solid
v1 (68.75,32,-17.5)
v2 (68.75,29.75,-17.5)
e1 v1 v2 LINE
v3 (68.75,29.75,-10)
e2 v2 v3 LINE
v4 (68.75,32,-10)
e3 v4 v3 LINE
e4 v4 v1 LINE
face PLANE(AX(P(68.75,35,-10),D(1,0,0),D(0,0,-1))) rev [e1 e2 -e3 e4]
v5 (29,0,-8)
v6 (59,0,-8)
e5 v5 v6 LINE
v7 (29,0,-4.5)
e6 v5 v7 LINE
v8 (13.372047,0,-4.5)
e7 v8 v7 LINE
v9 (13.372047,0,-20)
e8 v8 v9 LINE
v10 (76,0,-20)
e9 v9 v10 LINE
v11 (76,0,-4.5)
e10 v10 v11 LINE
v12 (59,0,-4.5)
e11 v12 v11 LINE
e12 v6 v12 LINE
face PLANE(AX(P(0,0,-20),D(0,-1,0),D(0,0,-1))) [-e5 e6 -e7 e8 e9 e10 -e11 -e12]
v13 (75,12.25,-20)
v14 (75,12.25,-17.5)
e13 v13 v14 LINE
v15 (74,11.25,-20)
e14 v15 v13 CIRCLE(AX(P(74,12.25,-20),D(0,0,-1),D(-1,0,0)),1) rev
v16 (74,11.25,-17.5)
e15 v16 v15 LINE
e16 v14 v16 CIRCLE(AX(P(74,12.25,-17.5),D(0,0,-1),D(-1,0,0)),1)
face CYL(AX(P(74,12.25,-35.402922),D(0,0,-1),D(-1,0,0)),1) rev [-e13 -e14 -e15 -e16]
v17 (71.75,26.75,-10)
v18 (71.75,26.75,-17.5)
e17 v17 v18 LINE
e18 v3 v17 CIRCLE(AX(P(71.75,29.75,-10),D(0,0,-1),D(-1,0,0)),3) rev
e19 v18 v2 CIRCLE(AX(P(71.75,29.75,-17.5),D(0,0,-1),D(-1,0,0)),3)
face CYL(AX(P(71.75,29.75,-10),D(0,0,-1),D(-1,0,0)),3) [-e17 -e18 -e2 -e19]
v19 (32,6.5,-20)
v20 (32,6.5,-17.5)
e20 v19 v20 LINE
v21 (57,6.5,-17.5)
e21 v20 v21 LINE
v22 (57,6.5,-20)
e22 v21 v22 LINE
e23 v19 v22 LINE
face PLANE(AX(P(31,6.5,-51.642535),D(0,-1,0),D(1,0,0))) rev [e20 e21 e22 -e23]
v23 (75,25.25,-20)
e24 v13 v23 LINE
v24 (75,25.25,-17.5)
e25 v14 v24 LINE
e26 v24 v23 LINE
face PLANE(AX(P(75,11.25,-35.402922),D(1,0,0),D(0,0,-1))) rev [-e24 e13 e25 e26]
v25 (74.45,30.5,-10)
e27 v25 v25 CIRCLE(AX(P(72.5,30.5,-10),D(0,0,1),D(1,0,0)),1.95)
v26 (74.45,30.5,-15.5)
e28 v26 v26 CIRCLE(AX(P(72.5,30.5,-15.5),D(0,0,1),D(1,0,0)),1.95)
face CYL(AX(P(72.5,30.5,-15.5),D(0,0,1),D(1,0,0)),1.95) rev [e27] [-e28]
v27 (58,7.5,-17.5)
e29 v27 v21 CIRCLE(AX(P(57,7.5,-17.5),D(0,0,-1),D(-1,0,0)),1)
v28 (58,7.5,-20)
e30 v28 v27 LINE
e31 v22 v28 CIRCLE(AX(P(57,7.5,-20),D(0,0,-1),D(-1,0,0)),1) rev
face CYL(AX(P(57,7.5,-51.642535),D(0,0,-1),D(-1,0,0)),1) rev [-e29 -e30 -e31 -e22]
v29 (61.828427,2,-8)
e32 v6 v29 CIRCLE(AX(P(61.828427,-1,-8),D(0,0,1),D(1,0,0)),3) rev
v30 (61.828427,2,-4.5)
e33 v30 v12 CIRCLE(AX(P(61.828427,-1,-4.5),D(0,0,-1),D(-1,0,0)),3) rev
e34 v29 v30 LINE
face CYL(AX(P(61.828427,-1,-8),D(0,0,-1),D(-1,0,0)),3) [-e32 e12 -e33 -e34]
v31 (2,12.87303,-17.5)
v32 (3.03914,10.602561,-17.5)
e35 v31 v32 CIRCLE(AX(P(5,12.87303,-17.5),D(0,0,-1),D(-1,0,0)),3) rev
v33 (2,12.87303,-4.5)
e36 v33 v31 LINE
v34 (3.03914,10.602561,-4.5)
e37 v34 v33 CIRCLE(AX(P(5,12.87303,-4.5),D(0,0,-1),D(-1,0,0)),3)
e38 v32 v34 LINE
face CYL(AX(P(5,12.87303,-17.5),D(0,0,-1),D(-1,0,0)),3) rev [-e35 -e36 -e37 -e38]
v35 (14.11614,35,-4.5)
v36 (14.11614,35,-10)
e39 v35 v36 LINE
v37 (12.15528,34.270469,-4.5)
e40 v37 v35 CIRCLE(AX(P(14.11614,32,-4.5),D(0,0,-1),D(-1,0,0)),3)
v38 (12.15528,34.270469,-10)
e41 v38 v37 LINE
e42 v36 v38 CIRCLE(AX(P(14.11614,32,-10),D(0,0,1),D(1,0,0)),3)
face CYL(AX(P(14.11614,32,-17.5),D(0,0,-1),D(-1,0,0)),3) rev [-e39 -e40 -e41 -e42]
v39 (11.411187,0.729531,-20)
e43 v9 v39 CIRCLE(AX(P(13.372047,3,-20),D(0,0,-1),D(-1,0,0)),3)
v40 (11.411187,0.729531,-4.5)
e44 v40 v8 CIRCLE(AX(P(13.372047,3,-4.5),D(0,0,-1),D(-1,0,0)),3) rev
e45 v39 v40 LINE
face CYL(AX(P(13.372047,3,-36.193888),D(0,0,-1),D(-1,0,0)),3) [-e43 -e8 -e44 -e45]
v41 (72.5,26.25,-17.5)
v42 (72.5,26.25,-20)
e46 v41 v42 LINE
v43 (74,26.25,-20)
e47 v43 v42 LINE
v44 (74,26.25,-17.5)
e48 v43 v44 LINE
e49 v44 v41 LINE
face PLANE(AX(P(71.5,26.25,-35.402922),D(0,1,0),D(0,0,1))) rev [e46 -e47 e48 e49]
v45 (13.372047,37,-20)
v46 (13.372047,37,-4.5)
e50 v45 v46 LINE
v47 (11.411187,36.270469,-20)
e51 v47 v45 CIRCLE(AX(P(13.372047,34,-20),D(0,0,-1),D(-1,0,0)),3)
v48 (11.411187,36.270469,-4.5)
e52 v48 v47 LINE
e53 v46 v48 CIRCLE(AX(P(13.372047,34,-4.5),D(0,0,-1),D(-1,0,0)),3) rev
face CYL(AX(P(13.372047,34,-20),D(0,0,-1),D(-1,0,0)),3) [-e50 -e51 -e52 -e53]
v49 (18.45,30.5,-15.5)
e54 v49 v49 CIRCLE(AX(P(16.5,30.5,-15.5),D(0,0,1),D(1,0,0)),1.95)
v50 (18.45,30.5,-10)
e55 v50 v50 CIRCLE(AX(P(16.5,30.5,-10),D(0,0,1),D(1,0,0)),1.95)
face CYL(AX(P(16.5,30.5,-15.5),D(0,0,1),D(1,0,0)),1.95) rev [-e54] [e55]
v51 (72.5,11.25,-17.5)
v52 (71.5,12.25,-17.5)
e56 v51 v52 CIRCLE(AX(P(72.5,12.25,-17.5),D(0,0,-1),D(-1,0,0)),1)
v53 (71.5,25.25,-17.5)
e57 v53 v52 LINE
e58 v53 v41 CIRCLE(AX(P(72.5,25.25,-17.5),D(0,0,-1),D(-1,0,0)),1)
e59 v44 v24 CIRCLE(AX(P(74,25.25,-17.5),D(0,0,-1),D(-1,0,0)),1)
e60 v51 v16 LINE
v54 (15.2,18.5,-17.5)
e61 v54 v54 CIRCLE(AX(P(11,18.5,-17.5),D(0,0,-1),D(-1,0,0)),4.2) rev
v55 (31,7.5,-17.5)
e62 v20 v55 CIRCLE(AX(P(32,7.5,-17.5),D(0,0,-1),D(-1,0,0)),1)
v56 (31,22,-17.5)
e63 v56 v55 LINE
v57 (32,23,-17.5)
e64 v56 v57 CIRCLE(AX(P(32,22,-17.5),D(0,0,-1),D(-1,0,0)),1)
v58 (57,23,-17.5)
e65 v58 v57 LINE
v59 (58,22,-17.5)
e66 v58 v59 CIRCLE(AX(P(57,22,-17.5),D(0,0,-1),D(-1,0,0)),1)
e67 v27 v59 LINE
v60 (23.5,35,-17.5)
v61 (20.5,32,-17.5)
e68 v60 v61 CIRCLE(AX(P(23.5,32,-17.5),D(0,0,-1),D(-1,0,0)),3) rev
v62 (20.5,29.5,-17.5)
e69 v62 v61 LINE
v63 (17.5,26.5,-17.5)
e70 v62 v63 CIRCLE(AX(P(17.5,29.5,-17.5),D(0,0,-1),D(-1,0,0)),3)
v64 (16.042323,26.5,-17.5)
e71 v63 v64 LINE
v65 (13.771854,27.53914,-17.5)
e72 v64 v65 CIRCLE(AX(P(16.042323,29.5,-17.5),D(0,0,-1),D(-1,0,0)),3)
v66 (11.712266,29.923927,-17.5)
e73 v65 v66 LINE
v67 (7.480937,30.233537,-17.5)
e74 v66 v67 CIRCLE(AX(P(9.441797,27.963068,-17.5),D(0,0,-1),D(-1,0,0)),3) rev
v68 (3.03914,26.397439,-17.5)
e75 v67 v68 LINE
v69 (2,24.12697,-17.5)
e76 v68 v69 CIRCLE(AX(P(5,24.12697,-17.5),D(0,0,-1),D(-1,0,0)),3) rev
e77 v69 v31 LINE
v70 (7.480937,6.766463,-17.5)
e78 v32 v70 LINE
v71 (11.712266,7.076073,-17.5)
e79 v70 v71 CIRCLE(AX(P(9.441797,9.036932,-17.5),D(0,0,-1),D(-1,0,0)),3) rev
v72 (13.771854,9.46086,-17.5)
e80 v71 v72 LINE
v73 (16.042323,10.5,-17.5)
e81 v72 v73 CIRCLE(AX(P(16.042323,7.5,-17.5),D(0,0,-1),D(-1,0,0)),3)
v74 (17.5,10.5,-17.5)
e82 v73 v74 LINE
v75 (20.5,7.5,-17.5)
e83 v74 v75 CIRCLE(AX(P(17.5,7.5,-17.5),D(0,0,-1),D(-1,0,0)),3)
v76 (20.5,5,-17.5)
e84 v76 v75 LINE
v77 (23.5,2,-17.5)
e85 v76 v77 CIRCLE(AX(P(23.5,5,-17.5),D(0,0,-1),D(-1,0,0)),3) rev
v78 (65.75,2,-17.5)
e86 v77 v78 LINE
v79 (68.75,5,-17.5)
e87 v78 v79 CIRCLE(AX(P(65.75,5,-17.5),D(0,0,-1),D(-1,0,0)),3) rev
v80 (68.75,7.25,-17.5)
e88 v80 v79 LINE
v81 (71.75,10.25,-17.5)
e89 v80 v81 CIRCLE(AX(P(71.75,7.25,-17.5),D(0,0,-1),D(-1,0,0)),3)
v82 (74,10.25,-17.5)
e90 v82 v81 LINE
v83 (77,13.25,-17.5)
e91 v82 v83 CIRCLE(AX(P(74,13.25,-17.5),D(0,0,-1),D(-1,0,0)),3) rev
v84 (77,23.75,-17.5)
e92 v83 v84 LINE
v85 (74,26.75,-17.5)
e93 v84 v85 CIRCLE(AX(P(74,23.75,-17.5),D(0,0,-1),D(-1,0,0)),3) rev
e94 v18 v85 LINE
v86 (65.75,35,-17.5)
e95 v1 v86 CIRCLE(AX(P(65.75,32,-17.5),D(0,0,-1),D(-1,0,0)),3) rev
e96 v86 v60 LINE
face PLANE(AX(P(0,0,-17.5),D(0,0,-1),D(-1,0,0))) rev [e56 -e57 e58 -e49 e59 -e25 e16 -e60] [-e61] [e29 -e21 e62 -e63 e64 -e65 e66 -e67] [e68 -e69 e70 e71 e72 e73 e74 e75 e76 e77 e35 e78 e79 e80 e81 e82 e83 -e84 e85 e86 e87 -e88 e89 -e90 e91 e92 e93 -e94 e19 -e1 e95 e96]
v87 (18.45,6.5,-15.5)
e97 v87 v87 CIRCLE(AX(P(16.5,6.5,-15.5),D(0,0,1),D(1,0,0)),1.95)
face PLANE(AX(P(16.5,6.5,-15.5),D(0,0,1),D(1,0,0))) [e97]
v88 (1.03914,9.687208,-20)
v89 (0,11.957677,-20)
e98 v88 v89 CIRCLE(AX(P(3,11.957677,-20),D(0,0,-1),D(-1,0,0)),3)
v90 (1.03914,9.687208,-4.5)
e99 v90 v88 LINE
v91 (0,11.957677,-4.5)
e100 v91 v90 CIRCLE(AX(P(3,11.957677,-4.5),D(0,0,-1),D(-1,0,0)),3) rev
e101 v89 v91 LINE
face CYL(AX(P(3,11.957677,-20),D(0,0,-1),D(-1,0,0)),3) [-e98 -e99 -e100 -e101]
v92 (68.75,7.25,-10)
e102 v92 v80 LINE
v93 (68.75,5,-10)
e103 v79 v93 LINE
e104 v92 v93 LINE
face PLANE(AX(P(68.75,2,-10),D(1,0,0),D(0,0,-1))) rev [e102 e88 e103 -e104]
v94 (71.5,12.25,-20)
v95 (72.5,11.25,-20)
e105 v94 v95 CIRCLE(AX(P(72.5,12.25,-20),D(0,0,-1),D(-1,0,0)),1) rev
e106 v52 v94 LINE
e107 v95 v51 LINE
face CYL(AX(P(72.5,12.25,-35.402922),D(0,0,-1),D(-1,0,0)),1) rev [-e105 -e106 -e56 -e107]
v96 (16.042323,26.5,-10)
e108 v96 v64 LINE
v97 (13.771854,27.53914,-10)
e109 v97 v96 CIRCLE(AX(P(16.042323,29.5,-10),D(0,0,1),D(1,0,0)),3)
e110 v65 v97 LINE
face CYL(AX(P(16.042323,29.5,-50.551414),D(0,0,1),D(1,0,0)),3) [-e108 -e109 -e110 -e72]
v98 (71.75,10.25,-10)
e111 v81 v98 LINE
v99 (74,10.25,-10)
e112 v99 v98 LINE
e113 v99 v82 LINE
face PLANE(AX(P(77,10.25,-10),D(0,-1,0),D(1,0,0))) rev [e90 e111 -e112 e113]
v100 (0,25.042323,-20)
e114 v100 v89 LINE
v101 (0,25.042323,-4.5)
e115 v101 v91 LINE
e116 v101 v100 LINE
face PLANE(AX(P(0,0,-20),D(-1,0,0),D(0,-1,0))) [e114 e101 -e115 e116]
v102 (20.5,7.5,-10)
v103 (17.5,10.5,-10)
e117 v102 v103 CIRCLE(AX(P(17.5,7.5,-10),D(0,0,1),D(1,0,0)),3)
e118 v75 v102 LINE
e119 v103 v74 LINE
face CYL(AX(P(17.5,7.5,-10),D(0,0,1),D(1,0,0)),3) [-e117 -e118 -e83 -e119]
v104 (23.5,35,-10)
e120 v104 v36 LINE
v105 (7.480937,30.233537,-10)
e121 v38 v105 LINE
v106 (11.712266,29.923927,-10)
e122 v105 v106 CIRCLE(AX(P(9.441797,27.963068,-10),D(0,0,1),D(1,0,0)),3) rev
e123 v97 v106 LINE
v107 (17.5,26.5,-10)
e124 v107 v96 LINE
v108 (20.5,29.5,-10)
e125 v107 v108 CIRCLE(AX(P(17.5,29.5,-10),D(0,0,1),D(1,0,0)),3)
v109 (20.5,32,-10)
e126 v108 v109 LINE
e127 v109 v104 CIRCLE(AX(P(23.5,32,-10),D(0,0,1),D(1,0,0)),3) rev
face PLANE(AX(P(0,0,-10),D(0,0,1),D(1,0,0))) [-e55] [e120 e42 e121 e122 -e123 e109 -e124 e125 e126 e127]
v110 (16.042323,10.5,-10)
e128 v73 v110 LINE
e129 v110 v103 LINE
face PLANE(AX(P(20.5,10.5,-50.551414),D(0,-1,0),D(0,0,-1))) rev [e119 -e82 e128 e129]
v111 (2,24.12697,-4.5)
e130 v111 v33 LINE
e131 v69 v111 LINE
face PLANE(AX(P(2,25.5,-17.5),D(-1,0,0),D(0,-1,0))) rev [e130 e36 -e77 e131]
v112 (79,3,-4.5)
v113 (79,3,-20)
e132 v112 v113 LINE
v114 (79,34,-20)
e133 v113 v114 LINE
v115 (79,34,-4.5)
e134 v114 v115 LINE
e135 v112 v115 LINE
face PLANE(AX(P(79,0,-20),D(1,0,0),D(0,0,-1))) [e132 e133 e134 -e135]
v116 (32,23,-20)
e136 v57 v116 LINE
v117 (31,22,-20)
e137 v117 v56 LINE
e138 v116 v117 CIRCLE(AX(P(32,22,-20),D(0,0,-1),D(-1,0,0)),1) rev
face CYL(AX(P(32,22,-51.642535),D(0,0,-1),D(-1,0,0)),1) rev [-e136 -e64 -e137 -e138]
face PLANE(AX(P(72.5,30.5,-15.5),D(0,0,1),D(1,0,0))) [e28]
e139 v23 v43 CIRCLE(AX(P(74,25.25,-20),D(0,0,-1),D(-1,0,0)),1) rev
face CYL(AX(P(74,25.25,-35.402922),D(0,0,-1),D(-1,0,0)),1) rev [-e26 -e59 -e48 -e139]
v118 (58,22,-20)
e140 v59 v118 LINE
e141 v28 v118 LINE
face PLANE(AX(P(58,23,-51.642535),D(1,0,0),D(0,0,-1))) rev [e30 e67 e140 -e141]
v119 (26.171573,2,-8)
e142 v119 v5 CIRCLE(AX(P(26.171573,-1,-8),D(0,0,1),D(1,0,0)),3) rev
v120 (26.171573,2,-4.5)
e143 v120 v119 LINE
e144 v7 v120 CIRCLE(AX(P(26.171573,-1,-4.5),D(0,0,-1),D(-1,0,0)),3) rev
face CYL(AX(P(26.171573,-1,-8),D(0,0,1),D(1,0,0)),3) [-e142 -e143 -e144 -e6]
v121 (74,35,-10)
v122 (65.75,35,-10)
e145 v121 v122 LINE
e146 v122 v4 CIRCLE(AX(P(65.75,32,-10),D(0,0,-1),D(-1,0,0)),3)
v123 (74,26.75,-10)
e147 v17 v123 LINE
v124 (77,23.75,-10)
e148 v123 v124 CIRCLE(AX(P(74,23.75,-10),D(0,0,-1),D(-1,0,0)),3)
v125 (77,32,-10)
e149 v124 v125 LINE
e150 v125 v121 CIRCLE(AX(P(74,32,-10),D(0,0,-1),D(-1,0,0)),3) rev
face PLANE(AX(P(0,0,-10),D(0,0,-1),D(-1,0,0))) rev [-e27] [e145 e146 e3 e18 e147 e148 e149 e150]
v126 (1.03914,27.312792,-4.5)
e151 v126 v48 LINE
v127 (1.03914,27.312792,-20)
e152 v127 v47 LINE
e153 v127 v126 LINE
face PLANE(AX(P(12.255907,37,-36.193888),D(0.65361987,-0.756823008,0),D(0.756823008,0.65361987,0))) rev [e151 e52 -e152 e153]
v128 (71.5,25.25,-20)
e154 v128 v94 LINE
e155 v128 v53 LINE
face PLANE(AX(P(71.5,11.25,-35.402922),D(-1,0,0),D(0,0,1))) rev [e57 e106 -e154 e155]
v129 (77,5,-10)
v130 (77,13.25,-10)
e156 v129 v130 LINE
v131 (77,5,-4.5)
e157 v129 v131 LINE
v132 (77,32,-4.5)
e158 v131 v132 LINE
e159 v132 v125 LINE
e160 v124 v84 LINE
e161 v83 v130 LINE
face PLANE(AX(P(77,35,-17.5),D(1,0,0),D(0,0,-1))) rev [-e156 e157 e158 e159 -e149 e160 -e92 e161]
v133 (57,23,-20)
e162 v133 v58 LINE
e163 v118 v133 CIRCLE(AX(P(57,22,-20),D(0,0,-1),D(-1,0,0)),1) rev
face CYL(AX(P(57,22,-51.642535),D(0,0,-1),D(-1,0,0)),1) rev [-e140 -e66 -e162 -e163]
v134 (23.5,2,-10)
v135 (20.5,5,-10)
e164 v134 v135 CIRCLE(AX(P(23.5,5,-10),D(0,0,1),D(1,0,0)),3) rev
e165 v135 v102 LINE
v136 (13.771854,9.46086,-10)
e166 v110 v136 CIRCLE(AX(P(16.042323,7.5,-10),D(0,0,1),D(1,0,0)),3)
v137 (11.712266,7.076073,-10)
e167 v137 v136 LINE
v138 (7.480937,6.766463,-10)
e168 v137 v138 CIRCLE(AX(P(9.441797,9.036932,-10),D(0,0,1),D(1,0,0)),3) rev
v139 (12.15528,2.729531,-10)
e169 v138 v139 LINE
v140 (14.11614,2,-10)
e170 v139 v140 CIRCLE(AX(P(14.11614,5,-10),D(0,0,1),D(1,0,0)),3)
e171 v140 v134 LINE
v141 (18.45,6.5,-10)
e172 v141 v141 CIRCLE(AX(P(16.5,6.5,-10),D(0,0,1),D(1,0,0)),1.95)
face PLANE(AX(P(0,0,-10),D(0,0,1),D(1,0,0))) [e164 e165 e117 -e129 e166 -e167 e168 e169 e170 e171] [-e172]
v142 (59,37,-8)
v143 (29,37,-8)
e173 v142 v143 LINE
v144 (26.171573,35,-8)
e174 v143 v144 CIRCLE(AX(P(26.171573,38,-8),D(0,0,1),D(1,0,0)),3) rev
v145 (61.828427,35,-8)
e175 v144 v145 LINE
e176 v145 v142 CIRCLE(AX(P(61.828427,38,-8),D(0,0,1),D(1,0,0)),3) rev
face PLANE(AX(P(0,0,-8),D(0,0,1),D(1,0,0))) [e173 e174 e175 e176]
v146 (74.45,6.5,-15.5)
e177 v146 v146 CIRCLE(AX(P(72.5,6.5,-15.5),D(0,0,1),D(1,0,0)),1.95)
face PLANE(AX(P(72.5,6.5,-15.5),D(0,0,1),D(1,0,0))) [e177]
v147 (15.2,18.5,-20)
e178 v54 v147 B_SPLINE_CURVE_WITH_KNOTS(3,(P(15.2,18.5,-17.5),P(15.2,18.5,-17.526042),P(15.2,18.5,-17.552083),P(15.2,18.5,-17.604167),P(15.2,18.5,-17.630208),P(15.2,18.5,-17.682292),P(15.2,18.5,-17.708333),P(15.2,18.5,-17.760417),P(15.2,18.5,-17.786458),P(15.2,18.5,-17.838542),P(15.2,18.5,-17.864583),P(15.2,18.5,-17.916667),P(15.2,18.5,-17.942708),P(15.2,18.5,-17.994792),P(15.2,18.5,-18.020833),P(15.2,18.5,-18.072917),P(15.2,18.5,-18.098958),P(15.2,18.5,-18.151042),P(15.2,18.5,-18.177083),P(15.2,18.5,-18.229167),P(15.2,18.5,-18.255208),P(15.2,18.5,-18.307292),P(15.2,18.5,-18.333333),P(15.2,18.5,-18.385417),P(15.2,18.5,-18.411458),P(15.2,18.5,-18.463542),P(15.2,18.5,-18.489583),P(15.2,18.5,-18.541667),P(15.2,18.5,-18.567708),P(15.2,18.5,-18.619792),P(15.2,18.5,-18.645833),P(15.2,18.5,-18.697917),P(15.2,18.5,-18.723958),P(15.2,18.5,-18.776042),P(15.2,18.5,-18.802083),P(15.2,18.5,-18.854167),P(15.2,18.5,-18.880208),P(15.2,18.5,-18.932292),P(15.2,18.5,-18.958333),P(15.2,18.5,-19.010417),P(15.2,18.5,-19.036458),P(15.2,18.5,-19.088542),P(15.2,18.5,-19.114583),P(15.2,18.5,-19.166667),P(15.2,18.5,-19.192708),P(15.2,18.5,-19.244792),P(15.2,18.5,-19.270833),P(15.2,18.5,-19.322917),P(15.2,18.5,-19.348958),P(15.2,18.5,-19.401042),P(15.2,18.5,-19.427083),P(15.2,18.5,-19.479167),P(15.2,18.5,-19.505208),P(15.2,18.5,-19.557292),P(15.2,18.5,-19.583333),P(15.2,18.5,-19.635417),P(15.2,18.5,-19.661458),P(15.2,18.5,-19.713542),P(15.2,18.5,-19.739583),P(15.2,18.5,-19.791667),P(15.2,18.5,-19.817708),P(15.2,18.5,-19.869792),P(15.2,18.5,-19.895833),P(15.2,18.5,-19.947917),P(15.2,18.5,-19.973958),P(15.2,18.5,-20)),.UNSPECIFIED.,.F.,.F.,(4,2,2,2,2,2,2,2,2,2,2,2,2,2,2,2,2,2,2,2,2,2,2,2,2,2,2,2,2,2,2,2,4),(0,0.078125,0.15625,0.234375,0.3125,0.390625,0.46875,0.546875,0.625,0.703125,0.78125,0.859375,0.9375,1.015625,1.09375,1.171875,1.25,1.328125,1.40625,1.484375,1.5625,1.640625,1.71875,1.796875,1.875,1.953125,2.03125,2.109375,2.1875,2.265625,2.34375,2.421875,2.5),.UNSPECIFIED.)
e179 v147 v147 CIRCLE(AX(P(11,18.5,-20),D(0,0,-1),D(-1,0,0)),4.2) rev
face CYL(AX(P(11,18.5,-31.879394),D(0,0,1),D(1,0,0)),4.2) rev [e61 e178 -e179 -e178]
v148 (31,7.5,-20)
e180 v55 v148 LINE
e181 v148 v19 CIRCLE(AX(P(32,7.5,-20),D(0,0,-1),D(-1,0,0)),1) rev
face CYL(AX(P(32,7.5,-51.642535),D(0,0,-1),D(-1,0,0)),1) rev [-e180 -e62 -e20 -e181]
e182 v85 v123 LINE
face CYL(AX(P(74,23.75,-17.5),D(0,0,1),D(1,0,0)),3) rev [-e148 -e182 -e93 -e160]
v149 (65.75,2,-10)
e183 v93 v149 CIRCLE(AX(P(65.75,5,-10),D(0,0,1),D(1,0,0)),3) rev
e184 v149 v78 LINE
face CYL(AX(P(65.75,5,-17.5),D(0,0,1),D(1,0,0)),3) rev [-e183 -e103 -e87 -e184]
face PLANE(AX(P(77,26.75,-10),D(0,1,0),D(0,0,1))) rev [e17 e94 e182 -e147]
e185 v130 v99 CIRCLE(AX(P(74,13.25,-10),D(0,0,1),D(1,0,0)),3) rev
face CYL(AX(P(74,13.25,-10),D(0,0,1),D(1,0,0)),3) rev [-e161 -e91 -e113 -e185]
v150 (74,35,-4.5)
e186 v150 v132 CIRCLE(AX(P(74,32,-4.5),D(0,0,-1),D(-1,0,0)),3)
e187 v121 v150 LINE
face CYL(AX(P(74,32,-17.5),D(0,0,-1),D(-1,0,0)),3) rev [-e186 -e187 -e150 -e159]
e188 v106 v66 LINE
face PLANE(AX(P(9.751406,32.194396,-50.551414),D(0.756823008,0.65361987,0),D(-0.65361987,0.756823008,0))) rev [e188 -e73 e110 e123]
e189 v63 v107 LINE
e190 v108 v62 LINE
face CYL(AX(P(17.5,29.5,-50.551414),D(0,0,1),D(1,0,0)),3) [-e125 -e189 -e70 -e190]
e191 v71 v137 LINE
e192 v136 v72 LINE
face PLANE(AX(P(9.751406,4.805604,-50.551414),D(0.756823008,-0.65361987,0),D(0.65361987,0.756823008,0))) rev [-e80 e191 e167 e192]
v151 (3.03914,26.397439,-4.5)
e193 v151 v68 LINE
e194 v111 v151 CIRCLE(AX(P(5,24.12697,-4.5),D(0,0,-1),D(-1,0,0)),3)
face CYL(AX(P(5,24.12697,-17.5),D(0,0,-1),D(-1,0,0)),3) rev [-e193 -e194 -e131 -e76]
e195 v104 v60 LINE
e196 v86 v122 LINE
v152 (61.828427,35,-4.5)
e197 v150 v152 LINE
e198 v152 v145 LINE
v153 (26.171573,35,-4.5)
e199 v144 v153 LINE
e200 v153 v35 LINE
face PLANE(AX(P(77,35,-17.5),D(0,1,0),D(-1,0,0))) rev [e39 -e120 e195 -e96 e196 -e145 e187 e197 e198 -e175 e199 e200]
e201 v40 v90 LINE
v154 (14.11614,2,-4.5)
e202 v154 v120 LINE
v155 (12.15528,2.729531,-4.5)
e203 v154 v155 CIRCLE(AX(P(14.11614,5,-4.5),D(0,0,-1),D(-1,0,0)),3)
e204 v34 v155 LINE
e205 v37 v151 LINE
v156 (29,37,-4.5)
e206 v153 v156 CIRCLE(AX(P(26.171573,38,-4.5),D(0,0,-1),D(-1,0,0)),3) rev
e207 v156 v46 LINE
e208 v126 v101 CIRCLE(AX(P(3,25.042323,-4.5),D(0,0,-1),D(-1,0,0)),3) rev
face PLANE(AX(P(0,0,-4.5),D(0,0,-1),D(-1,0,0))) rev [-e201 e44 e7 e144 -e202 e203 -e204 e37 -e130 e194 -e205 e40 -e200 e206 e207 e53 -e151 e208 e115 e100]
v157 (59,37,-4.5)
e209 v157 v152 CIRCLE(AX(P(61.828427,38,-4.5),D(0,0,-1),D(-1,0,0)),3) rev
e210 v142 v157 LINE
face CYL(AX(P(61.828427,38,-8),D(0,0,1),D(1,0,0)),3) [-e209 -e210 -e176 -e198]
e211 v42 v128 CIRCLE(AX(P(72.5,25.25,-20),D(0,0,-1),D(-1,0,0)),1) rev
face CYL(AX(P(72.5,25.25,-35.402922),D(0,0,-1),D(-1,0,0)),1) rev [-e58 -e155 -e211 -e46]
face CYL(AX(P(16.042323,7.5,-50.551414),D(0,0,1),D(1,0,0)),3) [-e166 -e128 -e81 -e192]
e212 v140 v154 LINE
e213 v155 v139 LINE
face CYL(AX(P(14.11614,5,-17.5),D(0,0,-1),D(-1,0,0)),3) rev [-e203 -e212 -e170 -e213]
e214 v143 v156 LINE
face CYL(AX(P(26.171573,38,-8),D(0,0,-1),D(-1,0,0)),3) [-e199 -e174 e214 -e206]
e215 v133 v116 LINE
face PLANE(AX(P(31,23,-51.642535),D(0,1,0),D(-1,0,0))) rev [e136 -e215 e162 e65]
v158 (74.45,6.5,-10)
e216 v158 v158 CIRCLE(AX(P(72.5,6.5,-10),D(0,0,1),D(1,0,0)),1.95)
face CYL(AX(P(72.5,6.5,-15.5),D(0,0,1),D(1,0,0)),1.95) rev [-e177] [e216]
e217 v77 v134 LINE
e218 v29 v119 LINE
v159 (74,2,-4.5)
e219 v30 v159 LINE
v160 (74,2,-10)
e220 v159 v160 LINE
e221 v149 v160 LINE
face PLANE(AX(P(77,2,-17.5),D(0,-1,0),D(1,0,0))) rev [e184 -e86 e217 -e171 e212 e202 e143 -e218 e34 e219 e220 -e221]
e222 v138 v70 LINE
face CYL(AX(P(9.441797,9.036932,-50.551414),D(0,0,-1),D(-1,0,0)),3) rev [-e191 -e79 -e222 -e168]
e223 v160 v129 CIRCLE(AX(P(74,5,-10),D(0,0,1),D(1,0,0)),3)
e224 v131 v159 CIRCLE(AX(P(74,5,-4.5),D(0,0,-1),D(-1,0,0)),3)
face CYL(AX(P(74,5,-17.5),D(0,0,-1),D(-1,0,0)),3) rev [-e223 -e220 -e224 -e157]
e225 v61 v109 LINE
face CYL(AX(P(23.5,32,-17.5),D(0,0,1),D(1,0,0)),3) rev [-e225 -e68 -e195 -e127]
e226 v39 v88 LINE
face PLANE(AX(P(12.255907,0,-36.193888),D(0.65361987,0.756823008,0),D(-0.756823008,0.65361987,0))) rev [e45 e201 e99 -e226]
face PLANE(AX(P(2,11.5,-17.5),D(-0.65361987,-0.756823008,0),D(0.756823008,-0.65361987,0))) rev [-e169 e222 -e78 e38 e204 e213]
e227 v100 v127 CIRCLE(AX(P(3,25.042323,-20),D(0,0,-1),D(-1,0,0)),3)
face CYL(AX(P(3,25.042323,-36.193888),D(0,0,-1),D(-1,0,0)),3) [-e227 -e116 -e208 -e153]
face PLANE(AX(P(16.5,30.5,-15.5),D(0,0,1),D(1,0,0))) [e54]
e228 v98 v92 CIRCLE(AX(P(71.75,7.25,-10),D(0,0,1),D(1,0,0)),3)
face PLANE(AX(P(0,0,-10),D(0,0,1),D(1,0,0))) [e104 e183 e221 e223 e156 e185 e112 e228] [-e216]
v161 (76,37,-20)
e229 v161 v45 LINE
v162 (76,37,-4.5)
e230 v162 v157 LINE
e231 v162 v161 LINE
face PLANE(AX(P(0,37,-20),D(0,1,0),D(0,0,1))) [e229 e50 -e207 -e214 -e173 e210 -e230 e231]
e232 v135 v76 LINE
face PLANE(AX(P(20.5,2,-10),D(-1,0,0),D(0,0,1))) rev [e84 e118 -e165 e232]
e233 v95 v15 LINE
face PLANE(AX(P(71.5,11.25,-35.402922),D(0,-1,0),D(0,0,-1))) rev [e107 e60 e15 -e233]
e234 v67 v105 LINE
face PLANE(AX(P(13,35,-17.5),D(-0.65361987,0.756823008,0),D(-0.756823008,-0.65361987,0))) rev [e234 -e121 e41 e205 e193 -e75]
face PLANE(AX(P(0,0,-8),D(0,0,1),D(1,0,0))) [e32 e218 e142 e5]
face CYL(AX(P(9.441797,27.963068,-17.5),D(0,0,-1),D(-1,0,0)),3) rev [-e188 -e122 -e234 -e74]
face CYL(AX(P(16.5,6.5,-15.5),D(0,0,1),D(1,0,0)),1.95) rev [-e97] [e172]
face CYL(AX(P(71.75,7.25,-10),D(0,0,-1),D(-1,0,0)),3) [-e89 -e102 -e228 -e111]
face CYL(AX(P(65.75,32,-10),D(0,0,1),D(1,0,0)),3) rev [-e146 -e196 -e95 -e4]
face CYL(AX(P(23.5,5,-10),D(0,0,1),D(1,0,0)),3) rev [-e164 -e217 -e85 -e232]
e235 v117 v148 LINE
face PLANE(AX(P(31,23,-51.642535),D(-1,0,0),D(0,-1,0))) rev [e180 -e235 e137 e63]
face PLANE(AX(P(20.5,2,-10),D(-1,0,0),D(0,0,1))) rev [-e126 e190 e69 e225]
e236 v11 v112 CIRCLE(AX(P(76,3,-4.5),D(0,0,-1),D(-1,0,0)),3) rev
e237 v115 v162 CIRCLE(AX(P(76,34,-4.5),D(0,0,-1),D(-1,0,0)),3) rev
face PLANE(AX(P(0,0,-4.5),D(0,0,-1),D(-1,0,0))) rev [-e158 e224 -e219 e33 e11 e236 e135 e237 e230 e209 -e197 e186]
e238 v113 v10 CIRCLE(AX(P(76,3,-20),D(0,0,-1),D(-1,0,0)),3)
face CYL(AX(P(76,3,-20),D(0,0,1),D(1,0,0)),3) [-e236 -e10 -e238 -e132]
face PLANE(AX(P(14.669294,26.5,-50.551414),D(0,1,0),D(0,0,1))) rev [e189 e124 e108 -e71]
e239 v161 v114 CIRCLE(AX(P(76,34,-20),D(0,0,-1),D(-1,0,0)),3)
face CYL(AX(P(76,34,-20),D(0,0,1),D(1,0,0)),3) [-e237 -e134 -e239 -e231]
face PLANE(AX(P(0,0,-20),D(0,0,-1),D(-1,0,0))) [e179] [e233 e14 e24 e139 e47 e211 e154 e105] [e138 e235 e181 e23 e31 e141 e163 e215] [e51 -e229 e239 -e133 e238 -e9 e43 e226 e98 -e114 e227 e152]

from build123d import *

# Parameters (mm, degrees)
BOSS_EXTRUDE1_DEPTH = 19.999999999999996
CUT_EXTRUDE1_DEPTH  = 17.5
CUT_EXTRUDE2_DEPTH  = 20
BOSS_EXTRUDE2_DEPTH = 7.5
SKETCH5_R           = 1.949999999999999
SKETCH5_R_2         = 1.949999999999998
SKETCH5_R_3         = 1.9499999999999986
CUT_EXTRUDE3_DEPTH  = 5.5
SKETCH6_R           = 4.199999999999999
CUT_EXTRUDE4_DEPTH  = 10
CUT_EXTRUDE5_DEPTH  = 2.5
CUT_EXTRUDE10_DEPTH = 7.5
SKETCH13_W          = 78.99999999999999
SKETCH13_H          = 37
CUT_EXTRUDE11_DEPTH = 4.5
CUT_EXTRUDE12_DEPTH = 3.5
SKETCH9_W           = 3.5
SKETCH9_H           = 15.000000000000004
CUT_EXTRUDE7_DEPTH  = 2.5
FILLET2_R           = 3
FILLET18_R          = 3
FILLET19_R          = 3
FILLET11_R          = 3
FILLET12_R          = 1
FILLET14_R          = 3
FILLET15_R          = 3
FILLET13_R          = 1
FILLET20_R          = 3


with BuildPart() as part:
    # Sketch1 → Boss-Extrude1 (new body)
    with BuildSketch(Plane.XY):
        Polygon((0, 0), (78.99999999999999, 0), (78.99999999999999, 37), (-6.72e-15, 37), align=None)
    extrude(amount=-BOSS_EXTRUDE1_DEPTH)

    # Sketch2 → Cut-Extrude1 (cut)
    with BuildSketch(Plane.XY):
        Polygon((76.99999999999999, 34.99999999999999), (12.999999999999984, 34.99999999999999), (1.9999999999999831, 25.499999999999996), (1.9999999999999718, 11.5), (13.000000000000004, 1.9999999999999922), (76.99999999999999, 2.0000000000000004), align=None)
    extrude(amount=-CUT_EXTRUDE1_DEPTH, mode=Mode.SUBTRACT)

    # Sketch3 → Cut-Extrude2 (cut)
    with BuildSketch(Plane.XY):
        Polygon((12.255906978158162, 37), (-6.72e-15, 26.41535306431793), (0, 37), align=None)
        Polygon((12.255906978158176, 1e-17), (1.389e-14, 10.584646935682041), (0, 0), align=None)
    extrude(amount=-CUT_EXTRUDE2_DEPTH, mode=Mode.SUBTRACT)

    # Sketch4 → Boss-Extrude2 (add)
    with BuildSketch(Plane.XY.offset(-17.5)):
        Polygon((76.99999999999999, 34.99999999999999), (68.74999999999999, 34.99999999999999), (68.74999999999999, 26.75), (76.99999999999997, 26.75), align=None)
        Polygon((12.999999999999984, 34.99999999999999), (20.49999999999999, 34.99999999999999), (20.49999999999999, 1.9999999999999922), (13.000000000000004, 1.9999999999999922), (1.9999999999999896, 11.49999999999998), (1.9999999999999882, 25.49999999999998), align=None)
        Polygon((76.99999999999999, 2), (68.74999999999999, 2.000000000000003), (68.74999999999999, 10.249999999999996), (76.99999999999999, 10.249999999999998), align=None)
    extrude(amount=BOSS_EXTRUDE2_DEPTH)

    # Sketch5 → Cut-Extrude3 (cut)
    with BuildSketch(Plane.XY.offset(-10.000000000000002)):
        with Locations((16.499999999999986, 30.5)):
            Circle(SKETCH5_R)
        with Locations((72.49999999999999, 30.5)):
            Circle(SKETCH5_R_2)
        with Locations((72.49999999999999, 6.499999999999999)):
            Circle(SKETCH5_R_3)
        with Locations((16.499999999999986, 6.499999999999985)):
            Circle(SKETCH5_R)
    extrude(amount=-CUT_EXTRUDE3_DEPTH, mode=Mode.SUBTRACT)

    # Sketch6 → Cut-Extrude4 (cut)
    with BuildSketch(Plane.XY.offset(-10.000000000000002)):
        with Locations((10.999999999999988, 18.5)):
            Circle(SKETCH6_R)
    extrude(amount=-CUT_EXTRUDE4_DEPTH, mode=Mode.SUBTRACT)

    # Sketch7 → Cut-Extrude5 (cut)
    with BuildSketch(Plane.XY.offset(-17.5)):
        Polygon((30.999999999999986, 23), (57.99999999999998, 23.000000000000004), (57.99999999999998, 6.500000000000003), (30.99999999999999, 6.499999999999999), align=None)
    extrude(amount=-CUT_EXTRUDE5_DEPTH, mode=Mode.SUBTRACT)

    # Sketch12 → Cut-Extrude10 (cut)
    with BuildSketch(Plane.XY.offset(-10.000000000000002)):
        Polygon((9.751406193775388, 32.19439625826063), (14.669293871364125, 26.5), (20.49999999999999, 26.5), (20.499999999999993, 10.499999999999986), (14.669293871364117, 10.499999999999986), (9.751406193775411, 4.805603741739363), (2.000000000000001, 11.499999999999991), (1.9999999999999862, 25.499999999999975), align=None)
    extrude(amount=-CUT_EXTRUDE10_DEPTH, mode=Mode.SUBTRACT)

    # Sketch13 → Cut-Extrude11 (cut)
    with BuildSketch(Plane.XY):
        with Locations((39.49999999999999, 18.5)):
            Rectangle(SKETCH13_W, SKETCH13_H)
    extrude(amount=-CUT_EXTRUDE11_DEPTH, mode=Mode.SUBTRACT)

    # Sketch14 → Cut-Extrude12 (cut)
    with BuildSketch(Plane.XY.offset(-4.5)):
        Polygon((28.999999999999986, 37), (58.999999999999986, 37.00000000000001), (58.999999999999986, 35), (28.999999999999986, 34.99999999999999), align=None)
        Polygon((28.999999999999986, 1.9999999999999931), (58.999999999999986, 1.9999999999999987), (58.999999999999986, 0), (28.999999999999986, -5.51e-15), align=None)
    extrude(amount=-CUT_EXTRUDE12_DEPTH, mode=Mode.SUBTRACT)

    # Sketch9 → Cut-Extrude7 (cut)
    with BuildSketch(Plane.XY.offset(-17.5)):
        with Locations((73.24999999999999, 18.75)):
            Rectangle(SKETCH9_W, SKETCH9_H)
    extrude(amount=-CUT_EXTRUDE7_DEPTH, mode=Mode.SUBTRACT)

    # Fillet2
    fillet2_edges = [part.edges().sort_by_distance(p)[0] for p in [
        (76.99999999999997, 26.75, -13.75),
        (68.74999999999999, 34.99999999999999, -13.75),
        (20.49999999999999, 1.9999999999999922, -13.75),
        (20.49999999999999, 34.99999999999999, -13.75),
        (76.99999999999999, 10.249999999999998, -13.75),
        (68.74999999999999, 2.000000000000003, -13.75),
    ]]
    fillet(fillet2_edges, radius=FILLET2_R)

    # Fillet18
    fillet18_edges = [part.edges().sort_by_distance(p)[0] for p in [
        (20.499999999999993, 10.499999999999986, -13.750000000000002),
        (20.49999999999999, 26.5, -13.750000000000002),
        (68.74999999999999, 26.75, -13.75),
        (68.74999999999999, 10.249999999999996, -13.75),
    ]]
    fillet(fillet18_edges, radius=FILLET18_R)

    # Fillet19
    fillet19_edges = [part.edges().sort_by_distance(p)[0] for p in [
        (9.751406193775411, 4.805603741739363, -13.750000000000002),
        (14.669293871364117, 10.499999999999986, -13.750000000000002),
        (14.669293871364125, 26.5, -13.750000000000002),
        (9.751406193775388, 32.19439625826063, -13.750000000000002),
    ]]
    fillet(fillet19_edges, radius=FILLET19_R)

    # Fillet11
    fillet11_edges = [part.edges().sort_by_distance(p)[0] for p in [
        (-6.72e-15, 26.41535306431793, -12.25),
        (12.255906978158162, 37, -12.25),
        (1.389e-14, 10.584646935682041, -12.25),
        (12.255906978158176, 1e-17, -12.25),
        (78.99999999999999, 37, -12.249999999999998),
        (78.99999999999999, 0, -12.249999999999998),
    ]]
    fillet(fillet11_edges, radius=FILLET11_R)

    # Fillet12
    fillet12_edges = [part.edges().sort_by_distance(p)[0] for p in [
        (57.99999999999998, 6.500000000000003, -18.75),
        (57.99999999999998, 23.000000000000004, -18.75),
        (30.999999999999986, 23, -18.75),
        (30.99999999999999, 6.499999999999999, -18.75),
    ]]
    fillet(fillet12_edges, radius=FILLET12_R)

    # Fillet14
    # the kernel refuses this fillet: 3 mm, written as the material it takes off along each edge
    with BuildSketch(Plane(origin=(58.999999999999986, 1.9999999999999982, 2.5710678118654613), x_dir=(-3.55e-15, -1, 0), z_dir=(0, 0, -1))) as fillet14_piece_1:
        with BuildLine():
            CenterArc((2.99999999999999, -2.828427124746195), FILLET14_R, 109.47122063449055, 70.52877936550925)
            Line((-1.027e-14, -2.8284271247461845), (-0.0600000000000101, -2.8284271247461845))
            Line((-0.0600000000000101, -2.8284271247461845), (-0.06000000000000005, 2.1e-16))
            Line((-0.06000000000000005, 2.1e-16), (2.1e-16, 0.06000000000000227))
            ThreePointArc((2.1e-16, 0.06000000000000227), (0.9999999999999986, 0.05999999999999872), (1.9799999999999969, 0.05656854249492234))
            Line((1.9799999999999969, 0.05656854249492234), (1.9999999999999967, 0))
        make_face()
    extrude(amount=10.571067811865461, mode=Mode.SUBTRACT)
    with BuildSketch(Plane(origin=(28.999999999999986, 1.9999999999999942, 2.571067811865479), x_dir=(0, -1, 0), z_dir=(0, 0, -1))) as fillet14_piece_2:
        with BuildLine():
            CenterArc((3, 2.8284271247461916), FILLET14_R, 180, 70.52877936550931)
            Line((2.2e-16, 2.8284271247461916), (-0.05999999999999961, 2.8284271247461916))
            Line((-0.05999999999999961, 2.8284271247461916), (-0.06000000000000005, 0))
            Line((-0.06000000000000005, 0), (0, -0.05999999999999872))
            ThreePointArc((0, -0.05999999999999872), (1.0000000000000002, -0.05999999999999872), (1.9800000000000004, -0.05656854249492227))
            Line((1.9800000000000004, -0.05656854249492227), (2.0000000000000004, 0))
        make_face()
    extrude(amount=10.571067811865479, mode=Mode.SUBTRACT)
    with BuildSketch(Plane(origin=(58.999999999999986, 34.99999999999999, 2.571067811865479), x_dir=(0, 1, 0), z_dir=(0, 0, -1))) as fillet14_piece_3:
        with BuildLine():
            CenterArc((3, 2.8284271247461916), FILLET14_R, 180, 70.52877936550954)
            Line((0, 2.8284271247461916), (-0.06000000000000227, 2.8284271247461916))
            Line((-0.06000000000000227, 2.8284271247461916), (-0.06000000000000227, 0))
            Line((-0.06000000000000227, 0), (0, -0.06000000000000227))
            ThreePointArc((0, -0.06000000000000227), (1.000000000000007, -0.06000000000000227), (1.980000000000011, -0.05656854249492227))
            Line((1.980000000000011, -0.05656854249492227), (2.000000000000014, 0))
        make_face()
    extrude(amount=10.571067811865479, mode=Mode.SUBTRACT)
    with BuildSketch(Plane(origin=(28.999999999999986, 34.99999999999999, 2.571067811865479), x_dir=(0, 1, 0), z_dir=(0, 0, -1))) as fillet14_piece_4:
        with BuildLine():
            CenterArc((3, -2.8284271247461916), FILLET14_R, 109.47122063449056, 70.52877936550944)
            Line((0, -2.8284271247461916), (-0.06000000000000227, -2.8284271247461916))
            Line((-0.06000000000000227, -2.8284271247461916), (-0.06000000000000227, 0))
            Line((-0.06000000000000227, 0), (0, 0.05999999999999872))
            ThreePointArc((0, 0.05999999999999872), (1.000000000000007, 0.05999999999999872), (1.980000000000004, 0.05656854249492227))
            Line((1.980000000000004, 0.05656854249492227), (2.000000000000007, 0))
        make_face()
    extrude(amount=10.571067811865479, mode=Mode.SUBTRACT)

    # Fillet15
    fillet15_edges = [part.edges().sort_by_distance(p)[0] for p in [
        (76.99999999999999, 34.99999999999999, -7.25),
        (12.999999999999984, 34.99999999999999, -7.25),
        (13.000000000000004, 1.9999999999999922, -7.25),
        (76.99999999999999, 2.0000000000000004, -7.25),
    ]]
    fillet(fillet15_edges, radius=FILLET15_R)

    # Fillet13
    fillet13_edges = [part.edges().sort_by_distance(p)[0] for p in [
        (74.99999999999999, 11.25, -18.75),
        (74.99999999999999, 26.25, -18.75),
        (71.49999999999999, 26.25, -18.75),
        (71.49999999999999, 11.25, -18.75),
    ]]
    fillet(fillet13_edges, radius=FILLET13_R)

    # Fillet20
    fillet20_edges = [part.edges().sort_by_distance(p)[0] for p in [
        (1.9999999999999851, 25.499999999999982, -11),
        (1.99999999999999, 11.499999999999995, -11),
    ]]
    fillet(fillet20_edges, radius=FILLET20_R)


solid = part.part
